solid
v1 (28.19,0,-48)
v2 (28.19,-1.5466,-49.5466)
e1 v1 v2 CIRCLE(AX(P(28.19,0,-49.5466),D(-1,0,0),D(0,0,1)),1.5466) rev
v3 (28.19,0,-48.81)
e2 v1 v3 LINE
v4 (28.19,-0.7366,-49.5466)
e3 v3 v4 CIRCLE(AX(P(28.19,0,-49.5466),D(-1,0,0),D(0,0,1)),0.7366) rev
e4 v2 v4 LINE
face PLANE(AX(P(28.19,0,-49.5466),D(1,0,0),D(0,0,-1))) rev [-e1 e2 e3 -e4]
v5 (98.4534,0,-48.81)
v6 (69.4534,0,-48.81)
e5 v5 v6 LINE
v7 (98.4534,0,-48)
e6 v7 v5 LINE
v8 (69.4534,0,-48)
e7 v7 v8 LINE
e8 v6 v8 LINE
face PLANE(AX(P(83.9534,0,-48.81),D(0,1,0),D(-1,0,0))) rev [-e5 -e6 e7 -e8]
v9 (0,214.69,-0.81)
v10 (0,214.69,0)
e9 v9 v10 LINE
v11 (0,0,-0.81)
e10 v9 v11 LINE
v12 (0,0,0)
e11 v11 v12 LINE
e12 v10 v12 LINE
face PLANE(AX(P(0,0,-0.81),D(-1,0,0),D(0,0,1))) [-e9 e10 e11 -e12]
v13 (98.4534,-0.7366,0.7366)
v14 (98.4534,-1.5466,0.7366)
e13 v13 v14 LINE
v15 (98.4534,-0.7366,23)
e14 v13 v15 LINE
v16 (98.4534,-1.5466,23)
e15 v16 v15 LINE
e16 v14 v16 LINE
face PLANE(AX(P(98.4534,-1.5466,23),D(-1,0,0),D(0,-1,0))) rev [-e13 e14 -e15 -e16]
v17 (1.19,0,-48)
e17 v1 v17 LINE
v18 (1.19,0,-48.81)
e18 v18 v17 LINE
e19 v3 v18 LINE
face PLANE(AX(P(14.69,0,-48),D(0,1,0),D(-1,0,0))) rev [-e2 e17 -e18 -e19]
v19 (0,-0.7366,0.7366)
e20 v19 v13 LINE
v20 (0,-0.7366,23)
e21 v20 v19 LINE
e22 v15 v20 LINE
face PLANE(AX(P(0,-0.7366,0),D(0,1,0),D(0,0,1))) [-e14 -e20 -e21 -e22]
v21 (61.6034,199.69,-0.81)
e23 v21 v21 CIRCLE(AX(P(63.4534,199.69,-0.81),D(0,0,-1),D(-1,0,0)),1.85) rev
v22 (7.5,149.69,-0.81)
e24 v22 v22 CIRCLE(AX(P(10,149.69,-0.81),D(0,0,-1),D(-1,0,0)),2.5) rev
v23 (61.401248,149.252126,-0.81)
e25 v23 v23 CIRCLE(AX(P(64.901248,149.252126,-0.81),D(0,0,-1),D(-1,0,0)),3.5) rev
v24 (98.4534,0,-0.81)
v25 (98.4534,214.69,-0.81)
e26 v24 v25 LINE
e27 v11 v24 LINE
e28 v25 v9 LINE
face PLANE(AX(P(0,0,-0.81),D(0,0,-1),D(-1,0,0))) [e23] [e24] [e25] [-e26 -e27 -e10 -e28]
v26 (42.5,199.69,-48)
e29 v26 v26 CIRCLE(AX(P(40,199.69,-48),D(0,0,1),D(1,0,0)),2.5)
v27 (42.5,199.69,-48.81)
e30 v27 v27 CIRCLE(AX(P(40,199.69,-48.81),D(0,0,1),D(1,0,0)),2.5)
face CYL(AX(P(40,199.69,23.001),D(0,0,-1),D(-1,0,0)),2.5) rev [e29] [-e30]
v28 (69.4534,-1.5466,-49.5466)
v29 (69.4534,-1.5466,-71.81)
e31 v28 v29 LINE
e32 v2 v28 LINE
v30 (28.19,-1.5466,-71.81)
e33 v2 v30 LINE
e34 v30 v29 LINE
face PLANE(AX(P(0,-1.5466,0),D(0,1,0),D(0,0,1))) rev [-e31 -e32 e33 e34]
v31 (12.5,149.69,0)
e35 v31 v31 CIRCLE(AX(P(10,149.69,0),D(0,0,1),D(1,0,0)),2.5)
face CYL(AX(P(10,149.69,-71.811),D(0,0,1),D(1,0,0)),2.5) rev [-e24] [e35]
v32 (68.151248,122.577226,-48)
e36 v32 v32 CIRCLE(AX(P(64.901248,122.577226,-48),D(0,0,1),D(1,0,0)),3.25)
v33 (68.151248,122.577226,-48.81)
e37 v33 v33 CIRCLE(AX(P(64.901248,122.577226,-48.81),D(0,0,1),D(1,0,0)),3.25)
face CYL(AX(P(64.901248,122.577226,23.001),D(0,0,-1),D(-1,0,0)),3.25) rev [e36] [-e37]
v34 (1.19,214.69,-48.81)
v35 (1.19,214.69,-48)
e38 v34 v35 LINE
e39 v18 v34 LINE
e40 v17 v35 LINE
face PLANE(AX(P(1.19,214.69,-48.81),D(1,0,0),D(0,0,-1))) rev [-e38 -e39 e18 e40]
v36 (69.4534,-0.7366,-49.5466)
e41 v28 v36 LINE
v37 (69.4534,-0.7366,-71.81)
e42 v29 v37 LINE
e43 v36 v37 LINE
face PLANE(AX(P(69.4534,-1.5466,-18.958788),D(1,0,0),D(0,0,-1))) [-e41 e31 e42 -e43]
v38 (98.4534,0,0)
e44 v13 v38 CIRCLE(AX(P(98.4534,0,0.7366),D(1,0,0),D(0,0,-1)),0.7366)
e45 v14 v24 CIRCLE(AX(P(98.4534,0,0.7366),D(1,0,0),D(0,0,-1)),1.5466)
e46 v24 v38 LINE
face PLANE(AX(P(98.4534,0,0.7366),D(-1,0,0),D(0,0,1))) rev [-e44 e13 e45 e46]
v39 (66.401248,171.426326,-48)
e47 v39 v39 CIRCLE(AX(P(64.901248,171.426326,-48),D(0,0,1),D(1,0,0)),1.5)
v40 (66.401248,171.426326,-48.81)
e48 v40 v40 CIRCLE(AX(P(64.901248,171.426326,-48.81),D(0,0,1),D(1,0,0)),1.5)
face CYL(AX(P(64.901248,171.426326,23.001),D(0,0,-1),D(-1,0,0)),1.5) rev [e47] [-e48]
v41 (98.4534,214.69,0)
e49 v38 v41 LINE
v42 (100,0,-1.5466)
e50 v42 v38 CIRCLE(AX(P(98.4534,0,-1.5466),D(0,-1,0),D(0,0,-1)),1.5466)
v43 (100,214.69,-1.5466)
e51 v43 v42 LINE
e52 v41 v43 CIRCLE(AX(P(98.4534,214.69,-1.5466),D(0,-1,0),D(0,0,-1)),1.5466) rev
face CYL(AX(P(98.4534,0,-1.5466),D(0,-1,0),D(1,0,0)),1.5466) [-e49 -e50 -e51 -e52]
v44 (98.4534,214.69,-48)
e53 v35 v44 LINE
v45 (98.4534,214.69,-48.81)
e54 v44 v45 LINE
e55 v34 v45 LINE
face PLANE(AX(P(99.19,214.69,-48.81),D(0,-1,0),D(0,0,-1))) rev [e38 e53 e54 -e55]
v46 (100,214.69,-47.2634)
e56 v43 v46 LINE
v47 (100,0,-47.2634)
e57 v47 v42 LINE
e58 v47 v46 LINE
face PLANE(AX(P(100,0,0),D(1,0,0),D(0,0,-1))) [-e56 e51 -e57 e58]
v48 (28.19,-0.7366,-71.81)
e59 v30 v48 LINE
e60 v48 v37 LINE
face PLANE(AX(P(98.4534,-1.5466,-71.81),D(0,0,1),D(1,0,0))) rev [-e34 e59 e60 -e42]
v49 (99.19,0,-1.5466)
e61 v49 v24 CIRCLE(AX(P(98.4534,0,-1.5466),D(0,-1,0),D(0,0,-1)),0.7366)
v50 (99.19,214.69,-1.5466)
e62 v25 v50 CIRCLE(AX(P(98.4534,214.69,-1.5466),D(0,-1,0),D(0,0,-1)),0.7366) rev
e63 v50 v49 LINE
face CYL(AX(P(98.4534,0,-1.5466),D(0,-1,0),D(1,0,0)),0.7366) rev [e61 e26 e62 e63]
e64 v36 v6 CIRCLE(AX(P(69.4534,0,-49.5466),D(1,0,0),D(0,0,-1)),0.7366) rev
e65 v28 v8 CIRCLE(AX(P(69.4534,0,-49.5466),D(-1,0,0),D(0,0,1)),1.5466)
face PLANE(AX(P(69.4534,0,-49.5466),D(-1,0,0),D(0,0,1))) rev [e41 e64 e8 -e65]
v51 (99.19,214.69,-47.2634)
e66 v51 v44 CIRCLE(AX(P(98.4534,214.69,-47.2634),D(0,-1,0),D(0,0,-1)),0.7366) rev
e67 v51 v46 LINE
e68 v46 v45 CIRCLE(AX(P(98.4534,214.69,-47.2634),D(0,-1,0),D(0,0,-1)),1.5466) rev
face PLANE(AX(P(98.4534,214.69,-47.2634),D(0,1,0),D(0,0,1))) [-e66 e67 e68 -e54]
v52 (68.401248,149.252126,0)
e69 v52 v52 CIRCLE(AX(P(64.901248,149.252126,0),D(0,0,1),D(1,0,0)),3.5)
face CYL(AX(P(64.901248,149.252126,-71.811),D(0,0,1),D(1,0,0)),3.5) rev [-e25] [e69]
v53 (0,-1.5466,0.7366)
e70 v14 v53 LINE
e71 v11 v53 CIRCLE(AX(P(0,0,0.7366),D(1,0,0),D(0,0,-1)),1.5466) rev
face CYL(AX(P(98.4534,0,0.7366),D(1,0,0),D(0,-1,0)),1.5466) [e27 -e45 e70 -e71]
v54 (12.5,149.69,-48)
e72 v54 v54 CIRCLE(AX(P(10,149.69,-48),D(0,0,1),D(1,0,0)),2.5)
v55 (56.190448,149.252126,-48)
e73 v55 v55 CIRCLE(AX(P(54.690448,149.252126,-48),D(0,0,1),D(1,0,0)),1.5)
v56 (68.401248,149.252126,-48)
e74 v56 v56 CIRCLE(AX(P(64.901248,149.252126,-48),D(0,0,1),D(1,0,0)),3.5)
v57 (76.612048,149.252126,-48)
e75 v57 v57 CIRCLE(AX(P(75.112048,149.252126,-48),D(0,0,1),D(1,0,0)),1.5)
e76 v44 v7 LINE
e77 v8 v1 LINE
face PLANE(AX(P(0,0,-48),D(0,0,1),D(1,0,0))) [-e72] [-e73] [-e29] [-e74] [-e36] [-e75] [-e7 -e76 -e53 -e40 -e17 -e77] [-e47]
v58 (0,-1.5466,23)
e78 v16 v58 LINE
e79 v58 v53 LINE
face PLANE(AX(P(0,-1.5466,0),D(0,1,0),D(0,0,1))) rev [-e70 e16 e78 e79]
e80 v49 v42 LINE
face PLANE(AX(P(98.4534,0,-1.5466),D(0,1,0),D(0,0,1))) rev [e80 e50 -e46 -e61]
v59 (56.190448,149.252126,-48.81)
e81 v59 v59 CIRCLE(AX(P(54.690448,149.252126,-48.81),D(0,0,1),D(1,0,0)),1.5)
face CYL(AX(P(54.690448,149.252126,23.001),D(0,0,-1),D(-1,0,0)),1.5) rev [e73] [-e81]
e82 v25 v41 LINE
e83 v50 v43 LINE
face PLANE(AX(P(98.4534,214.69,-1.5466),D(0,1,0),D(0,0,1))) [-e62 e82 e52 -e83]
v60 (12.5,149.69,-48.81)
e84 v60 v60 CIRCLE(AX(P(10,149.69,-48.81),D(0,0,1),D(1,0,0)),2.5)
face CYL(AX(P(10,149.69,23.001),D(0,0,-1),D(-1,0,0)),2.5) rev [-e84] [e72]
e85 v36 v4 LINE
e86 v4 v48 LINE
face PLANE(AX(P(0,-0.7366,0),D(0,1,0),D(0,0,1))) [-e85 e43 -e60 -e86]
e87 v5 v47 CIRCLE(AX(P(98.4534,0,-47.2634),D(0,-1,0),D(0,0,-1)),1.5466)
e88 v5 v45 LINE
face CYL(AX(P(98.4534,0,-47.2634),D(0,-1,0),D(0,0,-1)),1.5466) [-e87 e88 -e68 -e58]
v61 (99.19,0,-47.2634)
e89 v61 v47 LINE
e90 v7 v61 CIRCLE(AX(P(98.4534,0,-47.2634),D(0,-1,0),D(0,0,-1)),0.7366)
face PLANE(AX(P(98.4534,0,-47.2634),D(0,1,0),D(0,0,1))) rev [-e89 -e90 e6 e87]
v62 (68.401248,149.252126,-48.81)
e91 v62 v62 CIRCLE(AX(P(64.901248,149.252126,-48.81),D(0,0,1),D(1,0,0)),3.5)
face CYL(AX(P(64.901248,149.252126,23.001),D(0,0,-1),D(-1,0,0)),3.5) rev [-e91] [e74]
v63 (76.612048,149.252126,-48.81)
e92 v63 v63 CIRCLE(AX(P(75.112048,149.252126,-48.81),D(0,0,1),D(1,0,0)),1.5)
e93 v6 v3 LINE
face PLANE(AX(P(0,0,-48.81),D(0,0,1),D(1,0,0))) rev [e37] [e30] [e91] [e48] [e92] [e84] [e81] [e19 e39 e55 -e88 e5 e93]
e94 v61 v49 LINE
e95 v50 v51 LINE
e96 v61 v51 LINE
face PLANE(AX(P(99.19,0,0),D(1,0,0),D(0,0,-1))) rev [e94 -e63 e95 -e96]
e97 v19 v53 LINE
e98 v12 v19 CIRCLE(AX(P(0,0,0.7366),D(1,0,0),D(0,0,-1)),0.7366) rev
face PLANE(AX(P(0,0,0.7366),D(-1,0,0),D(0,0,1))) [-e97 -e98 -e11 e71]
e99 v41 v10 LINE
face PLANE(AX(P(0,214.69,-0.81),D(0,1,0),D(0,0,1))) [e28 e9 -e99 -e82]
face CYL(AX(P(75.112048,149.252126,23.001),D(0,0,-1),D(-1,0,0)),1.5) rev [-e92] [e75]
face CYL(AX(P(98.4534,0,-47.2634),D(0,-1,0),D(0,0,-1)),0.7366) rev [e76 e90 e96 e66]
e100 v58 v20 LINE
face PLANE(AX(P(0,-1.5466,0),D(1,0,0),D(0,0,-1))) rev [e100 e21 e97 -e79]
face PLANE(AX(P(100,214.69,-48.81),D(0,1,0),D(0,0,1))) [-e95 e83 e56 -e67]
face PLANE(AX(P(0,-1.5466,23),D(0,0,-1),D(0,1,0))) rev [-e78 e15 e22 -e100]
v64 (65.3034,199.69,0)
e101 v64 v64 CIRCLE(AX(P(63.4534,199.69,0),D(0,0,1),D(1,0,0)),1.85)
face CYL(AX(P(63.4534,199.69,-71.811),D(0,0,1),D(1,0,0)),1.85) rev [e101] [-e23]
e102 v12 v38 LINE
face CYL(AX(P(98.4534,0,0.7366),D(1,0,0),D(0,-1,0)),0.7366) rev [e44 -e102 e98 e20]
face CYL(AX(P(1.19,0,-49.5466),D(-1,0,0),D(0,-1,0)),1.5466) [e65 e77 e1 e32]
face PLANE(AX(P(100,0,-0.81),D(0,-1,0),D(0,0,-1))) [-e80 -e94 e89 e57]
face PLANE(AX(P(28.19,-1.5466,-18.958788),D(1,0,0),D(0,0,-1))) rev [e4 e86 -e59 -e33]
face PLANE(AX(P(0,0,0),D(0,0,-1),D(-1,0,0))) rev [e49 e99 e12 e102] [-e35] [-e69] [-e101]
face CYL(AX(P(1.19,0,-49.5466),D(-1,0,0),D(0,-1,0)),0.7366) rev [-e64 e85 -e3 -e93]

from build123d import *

# Parameters (mm, degrees)
SKETCH1_W                    = 100
SKETCH1_H                    = 214.69
BASE_FLANGE1_DEPTH           = 0.81
EDGE_FLANGE1_STRIP_W         = 4.7132
EDGE_FLANGE1_STRIP_H         = 0.81
EDGE_FLANGE1_STRIP_CUT_DEPTH = 214.69
EDGE_FLANGE1_DEPTH           = 214.69
EDGE_FLANGE2_STRIP_W         = 4.7132
EDGE_FLANGE2_STRIP_H         = 0.81
EDGE_FLANGE2_STRIP_CUT_DEPTH = 214.69
EDGE_FLANGE2_DEPTH           = 214.69
EDGE_FLANGE3_DEPTH           = 98.4534
EDGE_FLANGE3_BEND_DEPTH      = 97.2634
SKETCH18_W                   = 29
SKETCH18_H                   = 1.5466
SKETCH18_W_2                 = 27
CUT_EXTRUDE1_DEPTH           = 23.81
CUT_EXTRUDE2_REACH           = 249.484
SKETCH19_R                   = 2.5
SKETCH19_R_2                 = 3.5
SKETCH19_R_3                 = 1.5
SKETCH19_R_4                 = 3.25
CUT_EXTRUDE3_REACH           = 249.484
SKETCH20_R                   = 1.85
SKETCH20_R_2                 = 2.5
SKETCH20_R_3                 = 3.5


# Sheet-metal steps are written as plain solids
with BuildPart() as part:
    # Sketch1 → Base-Flange1 (new body)
    with BuildSketch(Plane.XY):
        with Locations((50, 107.345)):
            Rectangle(SKETCH1_W, SKETCH1_H)
    extrude(amount=-BASE_FLANGE1_DEPTH)

    # Edge-Flange1 strip (across the edge) → Edge-Flange1 strip cut (cut)
    with BuildSketch(Plane(origin=(100, 214.69, -0.81), x_dir=(-1, 0, 0), z_dir=(0, -1, 0))):
        with Locations((-0.81, -0.405)):
            Rectangle(EDGE_FLANGE1_STRIP_W, EDGE_FLANGE1_STRIP_H)
    extrude(amount=EDGE_FLANGE1_STRIP_CUT_DEPTH, mode=Mode.SUBTRACT)

    # Edge-Flange1 section (across the edge) → Edge-Flange1 (add)
    with BuildSketch(Plane(origin=(100, 214.69, -0.81), x_dir=(-1, 0, 0), z_dir=(0, -1, 0))):
        with BuildLine():
            Line((0, 0.7366), (0, 48))
            Line((0, 48), (0.81, 48))
            Line((0.81, 48), (0.81, 0.7366))
            ThreePointArc((0.81, 0.7366), (1.025745145, 0.215745145), (1.5466, 0))
            Line((1.5466, 0), (1.5466, -0.81))
            ThreePointArc((1.5466, -0.81), (0.452988652, -0.357011348), (0, 0.7366))
        make_face()
    extrude(amount=EDGE_FLANGE1_DEPTH)

    # Edge-Flange2 strip (across the edge) → Edge-Flange2 strip cut (cut)
    with BuildSketch(Plane(origin=(99.19, 214.69, -48.81), x_dir=(0, 0, 1), z_dir=(0, -1, 0))):
        with Locations((-0.81, -0.405)):
            Rectangle(EDGE_FLANGE2_STRIP_W, EDGE_FLANGE2_STRIP_H)
    extrude(amount=EDGE_FLANGE2_STRIP_CUT_DEPTH, mode=Mode.SUBTRACT)

    # Edge-Flange2 section (across the edge) → Edge-Flange2 (add)
    with BuildSketch(Plane(origin=(99.19, 214.69, -48.81), x_dir=(0, 0, 1), z_dir=(0, -1, 0))):
        with BuildLine():
            Line((0, 0.7366), (0, 98))
            Line((0, 98), (0.81, 98))
            Line((0.81, 98), (0.81, 0.7366))
            ThreePointArc((0.81, 0.7366), (1.025745145, 0.215745145), (1.5466, 0))
            Line((1.5466, 0), (1.5466, -0.81))
            ThreePointArc((1.5466, -0.81), (0.452988652, -0.357011348), (0, 0.7366))
        make_face()
    extrude(amount=EDGE_FLANGE2_DEPTH)

    # Edge-Flange3 section (across the edge) → Edge-Flange3 (add)
    with BuildSketch(Plane(origin=(0, -0.7366, 0), x_dir=(0, 1, 0), z_dir=(1, 0, 0))):
        with BuildLine():
            Line((-0.81, 0.7366), (-0.81, 23))
            Line((-0.81, 23), (0, 23))
            Line((0, 23), (0, 0.7366))
            ThreePointArc((0, 0.7366), (0.215745145, 0.215745145), (0.7366, 0))
            Line((0.7366, 0), (0.7366, -0.81))
            ThreePointArc((0.7366, -0.81), (-0.357011348, -0.357011348), (-0.81, 0.7366))
        make_face()
    extrude(amount=EDGE_FLANGE3_DEPTH)

    # Edge-Flange3 section 2 (across the edge) → Edge-Flange3 bend (add)
    with BuildSketch(Plane(origin=(98.4534, -0.7366, -48.81), x_dir=(0, 1, 0), z_dir=(-1, 0, 0))):
        with BuildLine():
            Line((-0.81, 0.7366), (-0.81, 23))
            Line((-0.81, 23), (0, 23))
            Line((0, 23), (0, 0.7366))
            ThreePointArc((0, 0.7366), (0.215745145, 0.215745145), (0.7366, 0))
            Line((0.7366, 0), (0.7366, -0.81))
            ThreePointArc((0.7366, -0.81), (-0.357011348, -0.357011348), (-0.81, 0.7366))
        make_face()
    extrude(amount=EDGE_FLANGE3_BEND_DEPTH)

    # Sketch18 → Cut-Extrude1 (cut)
    with BuildSketch(Plane(origin=(0, -57.7366, -71.81), x_dir=(1, 0, 0), z_dir=(0, 0, 1))):
        with Locations((83.9534, 56.9633)):
            Rectangle(SKETCH18_W, SKETCH18_H)
        with Locations((14.69, 56.9633)):
            Rectangle(SKETCH18_W_2, SKETCH18_H)
    extrude(amount=CUT_EXTRUDE1_DEPTH, mode=Mode.SUBTRACT)

    # Sketch19 → Cut-Extrude2 (cut, up to next)
    with BuildSketch(Plane.XY.offset(-48.81), mode=Mode.PRIVATE) as cut_extrude2_sk1:
        with Locations((40, 199.69)):
            Circle(SKETCH19_R)
    cut_extrude2_tool1 = extrude(cut_extrude2_sk1.sketch, amount=CUT_EXTRUDE2_REACH, mode=Mode.PRIVATE) & part.part
    # Sketch19 → Cut-Extrude2 (cut, up to next)
    with BuildSketch(Plane.XY.offset(-48.81), mode=Mode.PRIVATE) as cut_extrude2_sk2:
        with Locations((10, 149.69)):
            Circle(SKETCH19_R)
    cut_extrude2_tool2 = extrude(cut_extrude2_sk2.sketch, amount=CUT_EXTRUDE2_REACH, mode=Mode.PRIVATE) & part.part
    # Sketch19 → Cut-Extrude2 (cut, up to next)
    with BuildSketch(Plane.XY.offset(-48.81), mode=Mode.PRIVATE) as cut_extrude2_sk3:
        with Locations((64.901247632, 149.252126171)):
            Circle(SKETCH19_R_2)
    cut_extrude2_tool3 = extrude(cut_extrude2_sk3.sketch, amount=CUT_EXTRUDE2_REACH, mode=Mode.PRIVATE) & part.part
    # Sketch19 → Cut-Extrude2 (cut, up to next)
    with BuildSketch(Plane.XY.offset(-48.81), mode=Mode.PRIVATE) as cut_extrude2_sk4:
        with Locations((64.901247632, 171.426326171)):
            Circle(SKETCH19_R_3)
    cut_extrude2_tool4 = extrude(cut_extrude2_sk4.sketch, amount=CUT_EXTRUDE2_REACH, mode=Mode.PRIVATE) & part.part
    # Sketch19 → Cut-Extrude2 (cut, up to next)
    with BuildSketch(Plane.XY.offset(-48.81), mode=Mode.PRIVATE) as cut_extrude2_sk5:
        with Locations((75.112047632, 149.252126171)):
            Circle(SKETCH19_R_3)
    cut_extrude2_tool5 = extrude(cut_extrude2_sk5.sketch, amount=CUT_EXTRUDE2_REACH, mode=Mode.PRIVATE) & part.part
    # Sketch19 → Cut-Extrude2 (cut, up to next)
    with BuildSketch(Plane.XY.offset(-48.81), mode=Mode.PRIVATE) as cut_extrude2_sk6:
        with Locations((54.690447632, 149.252126171)):
            Circle(SKETCH19_R_3)
    cut_extrude2_tool6 = extrude(cut_extrude2_sk6.sketch, amount=CUT_EXTRUDE2_REACH, mode=Mode.PRIVATE) & part.part
    # Sketch19 → Cut-Extrude2 (cut, up to next)
    with BuildSketch(Plane.XY.offset(-48.81), mode=Mode.PRIVATE) as cut_extrude2_sk7:
        with Locations((64.901247632, 122.577226171)):
            Circle(SKETCH19_R_4)
    cut_extrude2_tool7 = extrude(cut_extrude2_sk7.sketch, amount=CUT_EXTRUDE2_REACH, mode=Mode.PRIVATE) & part.part
    add(cut_extrude2_tool1.solids().sort_by_distance((40, 199.69, -48.81))[0], mode=Mode.SUBTRACT)
    add(cut_extrude2_tool2.solids().sort_by_distance((10, 149.69, -48.81))[0], mode=Mode.SUBTRACT)
    add(cut_extrude2_tool3.solids().sort_by_distance((64.901248, 149.252126, -48.81))[0], mode=Mode.SUBTRACT)
    add(cut_extrude2_tool4.solids().sort_by_distance((64.901248, 171.426326, -48.81))[0], mode=Mode.SUBTRACT)
    add(cut_extrude2_tool5.solids().sort_by_distance((75.112048, 149.252126, -48.81))[0], mode=Mode.SUBTRACT)
    add(cut_extrude2_tool6.solids().sort_by_distance((54.690448, 149.252126, -48.81))[0], mode=Mode.SUBTRACT)
    add(cut_extrude2_tool7.solids().sort_by_distance((64.901248, 122.577226, -48.81))[0], mode=Mode.SUBTRACT)

    # Sketch20 → Cut-Extrude3 (cut, up to next)
    with BuildSketch(Plane.XY, mode=Mode.PRIVATE) as cut_extrude3_sk1:
        with Locations((63.4534, 199.69)):
            Circle(SKETCH20_R)
    cut_extrude3_tool1 = extrude(cut_extrude3_sk1.sketch, amount=-CUT_EXTRUDE3_REACH, mode=Mode.PRIVATE) & part.part
    # Sketch20 → Cut-Extrude3 (cut, up to next)
    with BuildSketch(Plane.XY, mode=Mode.PRIVATE) as cut_extrude3_sk2:
        with Locations((10, 149.69)):
            Circle(SKETCH20_R_2)
    cut_extrude3_tool2 = extrude(cut_extrude3_sk2.sketch, amount=-CUT_EXTRUDE3_REACH, mode=Mode.PRIVATE) & part.part
    # Sketch20 → Cut-Extrude3 (cut, up to next)
    with BuildSketch(Plane.XY, mode=Mode.PRIVATE) as cut_extrude3_sk3:
        with Locations((64.901247632, 149.252126171)):
            Circle(SKETCH20_R_3)
    cut_extrude3_tool3 = extrude(cut_extrude3_sk3.sketch, amount=-CUT_EXTRUDE3_REACH, mode=Mode.PRIVATE) & part.part
    add(cut_extrude3_tool1.solids().sort_by_distance((63.4534, 199.69, 0))[0], mode=Mode.SUBTRACT)
    add(cut_extrude3_tool2.solids().sort_by_distance((10, 149.69, 0))[0], mode=Mode.SUBTRACT)
    add(cut_extrude3_tool3.solids().sort_by_distance((64.901248, 149.252126, 0))[0], mode=Mode.SUBTRACT)


solid = part.part
